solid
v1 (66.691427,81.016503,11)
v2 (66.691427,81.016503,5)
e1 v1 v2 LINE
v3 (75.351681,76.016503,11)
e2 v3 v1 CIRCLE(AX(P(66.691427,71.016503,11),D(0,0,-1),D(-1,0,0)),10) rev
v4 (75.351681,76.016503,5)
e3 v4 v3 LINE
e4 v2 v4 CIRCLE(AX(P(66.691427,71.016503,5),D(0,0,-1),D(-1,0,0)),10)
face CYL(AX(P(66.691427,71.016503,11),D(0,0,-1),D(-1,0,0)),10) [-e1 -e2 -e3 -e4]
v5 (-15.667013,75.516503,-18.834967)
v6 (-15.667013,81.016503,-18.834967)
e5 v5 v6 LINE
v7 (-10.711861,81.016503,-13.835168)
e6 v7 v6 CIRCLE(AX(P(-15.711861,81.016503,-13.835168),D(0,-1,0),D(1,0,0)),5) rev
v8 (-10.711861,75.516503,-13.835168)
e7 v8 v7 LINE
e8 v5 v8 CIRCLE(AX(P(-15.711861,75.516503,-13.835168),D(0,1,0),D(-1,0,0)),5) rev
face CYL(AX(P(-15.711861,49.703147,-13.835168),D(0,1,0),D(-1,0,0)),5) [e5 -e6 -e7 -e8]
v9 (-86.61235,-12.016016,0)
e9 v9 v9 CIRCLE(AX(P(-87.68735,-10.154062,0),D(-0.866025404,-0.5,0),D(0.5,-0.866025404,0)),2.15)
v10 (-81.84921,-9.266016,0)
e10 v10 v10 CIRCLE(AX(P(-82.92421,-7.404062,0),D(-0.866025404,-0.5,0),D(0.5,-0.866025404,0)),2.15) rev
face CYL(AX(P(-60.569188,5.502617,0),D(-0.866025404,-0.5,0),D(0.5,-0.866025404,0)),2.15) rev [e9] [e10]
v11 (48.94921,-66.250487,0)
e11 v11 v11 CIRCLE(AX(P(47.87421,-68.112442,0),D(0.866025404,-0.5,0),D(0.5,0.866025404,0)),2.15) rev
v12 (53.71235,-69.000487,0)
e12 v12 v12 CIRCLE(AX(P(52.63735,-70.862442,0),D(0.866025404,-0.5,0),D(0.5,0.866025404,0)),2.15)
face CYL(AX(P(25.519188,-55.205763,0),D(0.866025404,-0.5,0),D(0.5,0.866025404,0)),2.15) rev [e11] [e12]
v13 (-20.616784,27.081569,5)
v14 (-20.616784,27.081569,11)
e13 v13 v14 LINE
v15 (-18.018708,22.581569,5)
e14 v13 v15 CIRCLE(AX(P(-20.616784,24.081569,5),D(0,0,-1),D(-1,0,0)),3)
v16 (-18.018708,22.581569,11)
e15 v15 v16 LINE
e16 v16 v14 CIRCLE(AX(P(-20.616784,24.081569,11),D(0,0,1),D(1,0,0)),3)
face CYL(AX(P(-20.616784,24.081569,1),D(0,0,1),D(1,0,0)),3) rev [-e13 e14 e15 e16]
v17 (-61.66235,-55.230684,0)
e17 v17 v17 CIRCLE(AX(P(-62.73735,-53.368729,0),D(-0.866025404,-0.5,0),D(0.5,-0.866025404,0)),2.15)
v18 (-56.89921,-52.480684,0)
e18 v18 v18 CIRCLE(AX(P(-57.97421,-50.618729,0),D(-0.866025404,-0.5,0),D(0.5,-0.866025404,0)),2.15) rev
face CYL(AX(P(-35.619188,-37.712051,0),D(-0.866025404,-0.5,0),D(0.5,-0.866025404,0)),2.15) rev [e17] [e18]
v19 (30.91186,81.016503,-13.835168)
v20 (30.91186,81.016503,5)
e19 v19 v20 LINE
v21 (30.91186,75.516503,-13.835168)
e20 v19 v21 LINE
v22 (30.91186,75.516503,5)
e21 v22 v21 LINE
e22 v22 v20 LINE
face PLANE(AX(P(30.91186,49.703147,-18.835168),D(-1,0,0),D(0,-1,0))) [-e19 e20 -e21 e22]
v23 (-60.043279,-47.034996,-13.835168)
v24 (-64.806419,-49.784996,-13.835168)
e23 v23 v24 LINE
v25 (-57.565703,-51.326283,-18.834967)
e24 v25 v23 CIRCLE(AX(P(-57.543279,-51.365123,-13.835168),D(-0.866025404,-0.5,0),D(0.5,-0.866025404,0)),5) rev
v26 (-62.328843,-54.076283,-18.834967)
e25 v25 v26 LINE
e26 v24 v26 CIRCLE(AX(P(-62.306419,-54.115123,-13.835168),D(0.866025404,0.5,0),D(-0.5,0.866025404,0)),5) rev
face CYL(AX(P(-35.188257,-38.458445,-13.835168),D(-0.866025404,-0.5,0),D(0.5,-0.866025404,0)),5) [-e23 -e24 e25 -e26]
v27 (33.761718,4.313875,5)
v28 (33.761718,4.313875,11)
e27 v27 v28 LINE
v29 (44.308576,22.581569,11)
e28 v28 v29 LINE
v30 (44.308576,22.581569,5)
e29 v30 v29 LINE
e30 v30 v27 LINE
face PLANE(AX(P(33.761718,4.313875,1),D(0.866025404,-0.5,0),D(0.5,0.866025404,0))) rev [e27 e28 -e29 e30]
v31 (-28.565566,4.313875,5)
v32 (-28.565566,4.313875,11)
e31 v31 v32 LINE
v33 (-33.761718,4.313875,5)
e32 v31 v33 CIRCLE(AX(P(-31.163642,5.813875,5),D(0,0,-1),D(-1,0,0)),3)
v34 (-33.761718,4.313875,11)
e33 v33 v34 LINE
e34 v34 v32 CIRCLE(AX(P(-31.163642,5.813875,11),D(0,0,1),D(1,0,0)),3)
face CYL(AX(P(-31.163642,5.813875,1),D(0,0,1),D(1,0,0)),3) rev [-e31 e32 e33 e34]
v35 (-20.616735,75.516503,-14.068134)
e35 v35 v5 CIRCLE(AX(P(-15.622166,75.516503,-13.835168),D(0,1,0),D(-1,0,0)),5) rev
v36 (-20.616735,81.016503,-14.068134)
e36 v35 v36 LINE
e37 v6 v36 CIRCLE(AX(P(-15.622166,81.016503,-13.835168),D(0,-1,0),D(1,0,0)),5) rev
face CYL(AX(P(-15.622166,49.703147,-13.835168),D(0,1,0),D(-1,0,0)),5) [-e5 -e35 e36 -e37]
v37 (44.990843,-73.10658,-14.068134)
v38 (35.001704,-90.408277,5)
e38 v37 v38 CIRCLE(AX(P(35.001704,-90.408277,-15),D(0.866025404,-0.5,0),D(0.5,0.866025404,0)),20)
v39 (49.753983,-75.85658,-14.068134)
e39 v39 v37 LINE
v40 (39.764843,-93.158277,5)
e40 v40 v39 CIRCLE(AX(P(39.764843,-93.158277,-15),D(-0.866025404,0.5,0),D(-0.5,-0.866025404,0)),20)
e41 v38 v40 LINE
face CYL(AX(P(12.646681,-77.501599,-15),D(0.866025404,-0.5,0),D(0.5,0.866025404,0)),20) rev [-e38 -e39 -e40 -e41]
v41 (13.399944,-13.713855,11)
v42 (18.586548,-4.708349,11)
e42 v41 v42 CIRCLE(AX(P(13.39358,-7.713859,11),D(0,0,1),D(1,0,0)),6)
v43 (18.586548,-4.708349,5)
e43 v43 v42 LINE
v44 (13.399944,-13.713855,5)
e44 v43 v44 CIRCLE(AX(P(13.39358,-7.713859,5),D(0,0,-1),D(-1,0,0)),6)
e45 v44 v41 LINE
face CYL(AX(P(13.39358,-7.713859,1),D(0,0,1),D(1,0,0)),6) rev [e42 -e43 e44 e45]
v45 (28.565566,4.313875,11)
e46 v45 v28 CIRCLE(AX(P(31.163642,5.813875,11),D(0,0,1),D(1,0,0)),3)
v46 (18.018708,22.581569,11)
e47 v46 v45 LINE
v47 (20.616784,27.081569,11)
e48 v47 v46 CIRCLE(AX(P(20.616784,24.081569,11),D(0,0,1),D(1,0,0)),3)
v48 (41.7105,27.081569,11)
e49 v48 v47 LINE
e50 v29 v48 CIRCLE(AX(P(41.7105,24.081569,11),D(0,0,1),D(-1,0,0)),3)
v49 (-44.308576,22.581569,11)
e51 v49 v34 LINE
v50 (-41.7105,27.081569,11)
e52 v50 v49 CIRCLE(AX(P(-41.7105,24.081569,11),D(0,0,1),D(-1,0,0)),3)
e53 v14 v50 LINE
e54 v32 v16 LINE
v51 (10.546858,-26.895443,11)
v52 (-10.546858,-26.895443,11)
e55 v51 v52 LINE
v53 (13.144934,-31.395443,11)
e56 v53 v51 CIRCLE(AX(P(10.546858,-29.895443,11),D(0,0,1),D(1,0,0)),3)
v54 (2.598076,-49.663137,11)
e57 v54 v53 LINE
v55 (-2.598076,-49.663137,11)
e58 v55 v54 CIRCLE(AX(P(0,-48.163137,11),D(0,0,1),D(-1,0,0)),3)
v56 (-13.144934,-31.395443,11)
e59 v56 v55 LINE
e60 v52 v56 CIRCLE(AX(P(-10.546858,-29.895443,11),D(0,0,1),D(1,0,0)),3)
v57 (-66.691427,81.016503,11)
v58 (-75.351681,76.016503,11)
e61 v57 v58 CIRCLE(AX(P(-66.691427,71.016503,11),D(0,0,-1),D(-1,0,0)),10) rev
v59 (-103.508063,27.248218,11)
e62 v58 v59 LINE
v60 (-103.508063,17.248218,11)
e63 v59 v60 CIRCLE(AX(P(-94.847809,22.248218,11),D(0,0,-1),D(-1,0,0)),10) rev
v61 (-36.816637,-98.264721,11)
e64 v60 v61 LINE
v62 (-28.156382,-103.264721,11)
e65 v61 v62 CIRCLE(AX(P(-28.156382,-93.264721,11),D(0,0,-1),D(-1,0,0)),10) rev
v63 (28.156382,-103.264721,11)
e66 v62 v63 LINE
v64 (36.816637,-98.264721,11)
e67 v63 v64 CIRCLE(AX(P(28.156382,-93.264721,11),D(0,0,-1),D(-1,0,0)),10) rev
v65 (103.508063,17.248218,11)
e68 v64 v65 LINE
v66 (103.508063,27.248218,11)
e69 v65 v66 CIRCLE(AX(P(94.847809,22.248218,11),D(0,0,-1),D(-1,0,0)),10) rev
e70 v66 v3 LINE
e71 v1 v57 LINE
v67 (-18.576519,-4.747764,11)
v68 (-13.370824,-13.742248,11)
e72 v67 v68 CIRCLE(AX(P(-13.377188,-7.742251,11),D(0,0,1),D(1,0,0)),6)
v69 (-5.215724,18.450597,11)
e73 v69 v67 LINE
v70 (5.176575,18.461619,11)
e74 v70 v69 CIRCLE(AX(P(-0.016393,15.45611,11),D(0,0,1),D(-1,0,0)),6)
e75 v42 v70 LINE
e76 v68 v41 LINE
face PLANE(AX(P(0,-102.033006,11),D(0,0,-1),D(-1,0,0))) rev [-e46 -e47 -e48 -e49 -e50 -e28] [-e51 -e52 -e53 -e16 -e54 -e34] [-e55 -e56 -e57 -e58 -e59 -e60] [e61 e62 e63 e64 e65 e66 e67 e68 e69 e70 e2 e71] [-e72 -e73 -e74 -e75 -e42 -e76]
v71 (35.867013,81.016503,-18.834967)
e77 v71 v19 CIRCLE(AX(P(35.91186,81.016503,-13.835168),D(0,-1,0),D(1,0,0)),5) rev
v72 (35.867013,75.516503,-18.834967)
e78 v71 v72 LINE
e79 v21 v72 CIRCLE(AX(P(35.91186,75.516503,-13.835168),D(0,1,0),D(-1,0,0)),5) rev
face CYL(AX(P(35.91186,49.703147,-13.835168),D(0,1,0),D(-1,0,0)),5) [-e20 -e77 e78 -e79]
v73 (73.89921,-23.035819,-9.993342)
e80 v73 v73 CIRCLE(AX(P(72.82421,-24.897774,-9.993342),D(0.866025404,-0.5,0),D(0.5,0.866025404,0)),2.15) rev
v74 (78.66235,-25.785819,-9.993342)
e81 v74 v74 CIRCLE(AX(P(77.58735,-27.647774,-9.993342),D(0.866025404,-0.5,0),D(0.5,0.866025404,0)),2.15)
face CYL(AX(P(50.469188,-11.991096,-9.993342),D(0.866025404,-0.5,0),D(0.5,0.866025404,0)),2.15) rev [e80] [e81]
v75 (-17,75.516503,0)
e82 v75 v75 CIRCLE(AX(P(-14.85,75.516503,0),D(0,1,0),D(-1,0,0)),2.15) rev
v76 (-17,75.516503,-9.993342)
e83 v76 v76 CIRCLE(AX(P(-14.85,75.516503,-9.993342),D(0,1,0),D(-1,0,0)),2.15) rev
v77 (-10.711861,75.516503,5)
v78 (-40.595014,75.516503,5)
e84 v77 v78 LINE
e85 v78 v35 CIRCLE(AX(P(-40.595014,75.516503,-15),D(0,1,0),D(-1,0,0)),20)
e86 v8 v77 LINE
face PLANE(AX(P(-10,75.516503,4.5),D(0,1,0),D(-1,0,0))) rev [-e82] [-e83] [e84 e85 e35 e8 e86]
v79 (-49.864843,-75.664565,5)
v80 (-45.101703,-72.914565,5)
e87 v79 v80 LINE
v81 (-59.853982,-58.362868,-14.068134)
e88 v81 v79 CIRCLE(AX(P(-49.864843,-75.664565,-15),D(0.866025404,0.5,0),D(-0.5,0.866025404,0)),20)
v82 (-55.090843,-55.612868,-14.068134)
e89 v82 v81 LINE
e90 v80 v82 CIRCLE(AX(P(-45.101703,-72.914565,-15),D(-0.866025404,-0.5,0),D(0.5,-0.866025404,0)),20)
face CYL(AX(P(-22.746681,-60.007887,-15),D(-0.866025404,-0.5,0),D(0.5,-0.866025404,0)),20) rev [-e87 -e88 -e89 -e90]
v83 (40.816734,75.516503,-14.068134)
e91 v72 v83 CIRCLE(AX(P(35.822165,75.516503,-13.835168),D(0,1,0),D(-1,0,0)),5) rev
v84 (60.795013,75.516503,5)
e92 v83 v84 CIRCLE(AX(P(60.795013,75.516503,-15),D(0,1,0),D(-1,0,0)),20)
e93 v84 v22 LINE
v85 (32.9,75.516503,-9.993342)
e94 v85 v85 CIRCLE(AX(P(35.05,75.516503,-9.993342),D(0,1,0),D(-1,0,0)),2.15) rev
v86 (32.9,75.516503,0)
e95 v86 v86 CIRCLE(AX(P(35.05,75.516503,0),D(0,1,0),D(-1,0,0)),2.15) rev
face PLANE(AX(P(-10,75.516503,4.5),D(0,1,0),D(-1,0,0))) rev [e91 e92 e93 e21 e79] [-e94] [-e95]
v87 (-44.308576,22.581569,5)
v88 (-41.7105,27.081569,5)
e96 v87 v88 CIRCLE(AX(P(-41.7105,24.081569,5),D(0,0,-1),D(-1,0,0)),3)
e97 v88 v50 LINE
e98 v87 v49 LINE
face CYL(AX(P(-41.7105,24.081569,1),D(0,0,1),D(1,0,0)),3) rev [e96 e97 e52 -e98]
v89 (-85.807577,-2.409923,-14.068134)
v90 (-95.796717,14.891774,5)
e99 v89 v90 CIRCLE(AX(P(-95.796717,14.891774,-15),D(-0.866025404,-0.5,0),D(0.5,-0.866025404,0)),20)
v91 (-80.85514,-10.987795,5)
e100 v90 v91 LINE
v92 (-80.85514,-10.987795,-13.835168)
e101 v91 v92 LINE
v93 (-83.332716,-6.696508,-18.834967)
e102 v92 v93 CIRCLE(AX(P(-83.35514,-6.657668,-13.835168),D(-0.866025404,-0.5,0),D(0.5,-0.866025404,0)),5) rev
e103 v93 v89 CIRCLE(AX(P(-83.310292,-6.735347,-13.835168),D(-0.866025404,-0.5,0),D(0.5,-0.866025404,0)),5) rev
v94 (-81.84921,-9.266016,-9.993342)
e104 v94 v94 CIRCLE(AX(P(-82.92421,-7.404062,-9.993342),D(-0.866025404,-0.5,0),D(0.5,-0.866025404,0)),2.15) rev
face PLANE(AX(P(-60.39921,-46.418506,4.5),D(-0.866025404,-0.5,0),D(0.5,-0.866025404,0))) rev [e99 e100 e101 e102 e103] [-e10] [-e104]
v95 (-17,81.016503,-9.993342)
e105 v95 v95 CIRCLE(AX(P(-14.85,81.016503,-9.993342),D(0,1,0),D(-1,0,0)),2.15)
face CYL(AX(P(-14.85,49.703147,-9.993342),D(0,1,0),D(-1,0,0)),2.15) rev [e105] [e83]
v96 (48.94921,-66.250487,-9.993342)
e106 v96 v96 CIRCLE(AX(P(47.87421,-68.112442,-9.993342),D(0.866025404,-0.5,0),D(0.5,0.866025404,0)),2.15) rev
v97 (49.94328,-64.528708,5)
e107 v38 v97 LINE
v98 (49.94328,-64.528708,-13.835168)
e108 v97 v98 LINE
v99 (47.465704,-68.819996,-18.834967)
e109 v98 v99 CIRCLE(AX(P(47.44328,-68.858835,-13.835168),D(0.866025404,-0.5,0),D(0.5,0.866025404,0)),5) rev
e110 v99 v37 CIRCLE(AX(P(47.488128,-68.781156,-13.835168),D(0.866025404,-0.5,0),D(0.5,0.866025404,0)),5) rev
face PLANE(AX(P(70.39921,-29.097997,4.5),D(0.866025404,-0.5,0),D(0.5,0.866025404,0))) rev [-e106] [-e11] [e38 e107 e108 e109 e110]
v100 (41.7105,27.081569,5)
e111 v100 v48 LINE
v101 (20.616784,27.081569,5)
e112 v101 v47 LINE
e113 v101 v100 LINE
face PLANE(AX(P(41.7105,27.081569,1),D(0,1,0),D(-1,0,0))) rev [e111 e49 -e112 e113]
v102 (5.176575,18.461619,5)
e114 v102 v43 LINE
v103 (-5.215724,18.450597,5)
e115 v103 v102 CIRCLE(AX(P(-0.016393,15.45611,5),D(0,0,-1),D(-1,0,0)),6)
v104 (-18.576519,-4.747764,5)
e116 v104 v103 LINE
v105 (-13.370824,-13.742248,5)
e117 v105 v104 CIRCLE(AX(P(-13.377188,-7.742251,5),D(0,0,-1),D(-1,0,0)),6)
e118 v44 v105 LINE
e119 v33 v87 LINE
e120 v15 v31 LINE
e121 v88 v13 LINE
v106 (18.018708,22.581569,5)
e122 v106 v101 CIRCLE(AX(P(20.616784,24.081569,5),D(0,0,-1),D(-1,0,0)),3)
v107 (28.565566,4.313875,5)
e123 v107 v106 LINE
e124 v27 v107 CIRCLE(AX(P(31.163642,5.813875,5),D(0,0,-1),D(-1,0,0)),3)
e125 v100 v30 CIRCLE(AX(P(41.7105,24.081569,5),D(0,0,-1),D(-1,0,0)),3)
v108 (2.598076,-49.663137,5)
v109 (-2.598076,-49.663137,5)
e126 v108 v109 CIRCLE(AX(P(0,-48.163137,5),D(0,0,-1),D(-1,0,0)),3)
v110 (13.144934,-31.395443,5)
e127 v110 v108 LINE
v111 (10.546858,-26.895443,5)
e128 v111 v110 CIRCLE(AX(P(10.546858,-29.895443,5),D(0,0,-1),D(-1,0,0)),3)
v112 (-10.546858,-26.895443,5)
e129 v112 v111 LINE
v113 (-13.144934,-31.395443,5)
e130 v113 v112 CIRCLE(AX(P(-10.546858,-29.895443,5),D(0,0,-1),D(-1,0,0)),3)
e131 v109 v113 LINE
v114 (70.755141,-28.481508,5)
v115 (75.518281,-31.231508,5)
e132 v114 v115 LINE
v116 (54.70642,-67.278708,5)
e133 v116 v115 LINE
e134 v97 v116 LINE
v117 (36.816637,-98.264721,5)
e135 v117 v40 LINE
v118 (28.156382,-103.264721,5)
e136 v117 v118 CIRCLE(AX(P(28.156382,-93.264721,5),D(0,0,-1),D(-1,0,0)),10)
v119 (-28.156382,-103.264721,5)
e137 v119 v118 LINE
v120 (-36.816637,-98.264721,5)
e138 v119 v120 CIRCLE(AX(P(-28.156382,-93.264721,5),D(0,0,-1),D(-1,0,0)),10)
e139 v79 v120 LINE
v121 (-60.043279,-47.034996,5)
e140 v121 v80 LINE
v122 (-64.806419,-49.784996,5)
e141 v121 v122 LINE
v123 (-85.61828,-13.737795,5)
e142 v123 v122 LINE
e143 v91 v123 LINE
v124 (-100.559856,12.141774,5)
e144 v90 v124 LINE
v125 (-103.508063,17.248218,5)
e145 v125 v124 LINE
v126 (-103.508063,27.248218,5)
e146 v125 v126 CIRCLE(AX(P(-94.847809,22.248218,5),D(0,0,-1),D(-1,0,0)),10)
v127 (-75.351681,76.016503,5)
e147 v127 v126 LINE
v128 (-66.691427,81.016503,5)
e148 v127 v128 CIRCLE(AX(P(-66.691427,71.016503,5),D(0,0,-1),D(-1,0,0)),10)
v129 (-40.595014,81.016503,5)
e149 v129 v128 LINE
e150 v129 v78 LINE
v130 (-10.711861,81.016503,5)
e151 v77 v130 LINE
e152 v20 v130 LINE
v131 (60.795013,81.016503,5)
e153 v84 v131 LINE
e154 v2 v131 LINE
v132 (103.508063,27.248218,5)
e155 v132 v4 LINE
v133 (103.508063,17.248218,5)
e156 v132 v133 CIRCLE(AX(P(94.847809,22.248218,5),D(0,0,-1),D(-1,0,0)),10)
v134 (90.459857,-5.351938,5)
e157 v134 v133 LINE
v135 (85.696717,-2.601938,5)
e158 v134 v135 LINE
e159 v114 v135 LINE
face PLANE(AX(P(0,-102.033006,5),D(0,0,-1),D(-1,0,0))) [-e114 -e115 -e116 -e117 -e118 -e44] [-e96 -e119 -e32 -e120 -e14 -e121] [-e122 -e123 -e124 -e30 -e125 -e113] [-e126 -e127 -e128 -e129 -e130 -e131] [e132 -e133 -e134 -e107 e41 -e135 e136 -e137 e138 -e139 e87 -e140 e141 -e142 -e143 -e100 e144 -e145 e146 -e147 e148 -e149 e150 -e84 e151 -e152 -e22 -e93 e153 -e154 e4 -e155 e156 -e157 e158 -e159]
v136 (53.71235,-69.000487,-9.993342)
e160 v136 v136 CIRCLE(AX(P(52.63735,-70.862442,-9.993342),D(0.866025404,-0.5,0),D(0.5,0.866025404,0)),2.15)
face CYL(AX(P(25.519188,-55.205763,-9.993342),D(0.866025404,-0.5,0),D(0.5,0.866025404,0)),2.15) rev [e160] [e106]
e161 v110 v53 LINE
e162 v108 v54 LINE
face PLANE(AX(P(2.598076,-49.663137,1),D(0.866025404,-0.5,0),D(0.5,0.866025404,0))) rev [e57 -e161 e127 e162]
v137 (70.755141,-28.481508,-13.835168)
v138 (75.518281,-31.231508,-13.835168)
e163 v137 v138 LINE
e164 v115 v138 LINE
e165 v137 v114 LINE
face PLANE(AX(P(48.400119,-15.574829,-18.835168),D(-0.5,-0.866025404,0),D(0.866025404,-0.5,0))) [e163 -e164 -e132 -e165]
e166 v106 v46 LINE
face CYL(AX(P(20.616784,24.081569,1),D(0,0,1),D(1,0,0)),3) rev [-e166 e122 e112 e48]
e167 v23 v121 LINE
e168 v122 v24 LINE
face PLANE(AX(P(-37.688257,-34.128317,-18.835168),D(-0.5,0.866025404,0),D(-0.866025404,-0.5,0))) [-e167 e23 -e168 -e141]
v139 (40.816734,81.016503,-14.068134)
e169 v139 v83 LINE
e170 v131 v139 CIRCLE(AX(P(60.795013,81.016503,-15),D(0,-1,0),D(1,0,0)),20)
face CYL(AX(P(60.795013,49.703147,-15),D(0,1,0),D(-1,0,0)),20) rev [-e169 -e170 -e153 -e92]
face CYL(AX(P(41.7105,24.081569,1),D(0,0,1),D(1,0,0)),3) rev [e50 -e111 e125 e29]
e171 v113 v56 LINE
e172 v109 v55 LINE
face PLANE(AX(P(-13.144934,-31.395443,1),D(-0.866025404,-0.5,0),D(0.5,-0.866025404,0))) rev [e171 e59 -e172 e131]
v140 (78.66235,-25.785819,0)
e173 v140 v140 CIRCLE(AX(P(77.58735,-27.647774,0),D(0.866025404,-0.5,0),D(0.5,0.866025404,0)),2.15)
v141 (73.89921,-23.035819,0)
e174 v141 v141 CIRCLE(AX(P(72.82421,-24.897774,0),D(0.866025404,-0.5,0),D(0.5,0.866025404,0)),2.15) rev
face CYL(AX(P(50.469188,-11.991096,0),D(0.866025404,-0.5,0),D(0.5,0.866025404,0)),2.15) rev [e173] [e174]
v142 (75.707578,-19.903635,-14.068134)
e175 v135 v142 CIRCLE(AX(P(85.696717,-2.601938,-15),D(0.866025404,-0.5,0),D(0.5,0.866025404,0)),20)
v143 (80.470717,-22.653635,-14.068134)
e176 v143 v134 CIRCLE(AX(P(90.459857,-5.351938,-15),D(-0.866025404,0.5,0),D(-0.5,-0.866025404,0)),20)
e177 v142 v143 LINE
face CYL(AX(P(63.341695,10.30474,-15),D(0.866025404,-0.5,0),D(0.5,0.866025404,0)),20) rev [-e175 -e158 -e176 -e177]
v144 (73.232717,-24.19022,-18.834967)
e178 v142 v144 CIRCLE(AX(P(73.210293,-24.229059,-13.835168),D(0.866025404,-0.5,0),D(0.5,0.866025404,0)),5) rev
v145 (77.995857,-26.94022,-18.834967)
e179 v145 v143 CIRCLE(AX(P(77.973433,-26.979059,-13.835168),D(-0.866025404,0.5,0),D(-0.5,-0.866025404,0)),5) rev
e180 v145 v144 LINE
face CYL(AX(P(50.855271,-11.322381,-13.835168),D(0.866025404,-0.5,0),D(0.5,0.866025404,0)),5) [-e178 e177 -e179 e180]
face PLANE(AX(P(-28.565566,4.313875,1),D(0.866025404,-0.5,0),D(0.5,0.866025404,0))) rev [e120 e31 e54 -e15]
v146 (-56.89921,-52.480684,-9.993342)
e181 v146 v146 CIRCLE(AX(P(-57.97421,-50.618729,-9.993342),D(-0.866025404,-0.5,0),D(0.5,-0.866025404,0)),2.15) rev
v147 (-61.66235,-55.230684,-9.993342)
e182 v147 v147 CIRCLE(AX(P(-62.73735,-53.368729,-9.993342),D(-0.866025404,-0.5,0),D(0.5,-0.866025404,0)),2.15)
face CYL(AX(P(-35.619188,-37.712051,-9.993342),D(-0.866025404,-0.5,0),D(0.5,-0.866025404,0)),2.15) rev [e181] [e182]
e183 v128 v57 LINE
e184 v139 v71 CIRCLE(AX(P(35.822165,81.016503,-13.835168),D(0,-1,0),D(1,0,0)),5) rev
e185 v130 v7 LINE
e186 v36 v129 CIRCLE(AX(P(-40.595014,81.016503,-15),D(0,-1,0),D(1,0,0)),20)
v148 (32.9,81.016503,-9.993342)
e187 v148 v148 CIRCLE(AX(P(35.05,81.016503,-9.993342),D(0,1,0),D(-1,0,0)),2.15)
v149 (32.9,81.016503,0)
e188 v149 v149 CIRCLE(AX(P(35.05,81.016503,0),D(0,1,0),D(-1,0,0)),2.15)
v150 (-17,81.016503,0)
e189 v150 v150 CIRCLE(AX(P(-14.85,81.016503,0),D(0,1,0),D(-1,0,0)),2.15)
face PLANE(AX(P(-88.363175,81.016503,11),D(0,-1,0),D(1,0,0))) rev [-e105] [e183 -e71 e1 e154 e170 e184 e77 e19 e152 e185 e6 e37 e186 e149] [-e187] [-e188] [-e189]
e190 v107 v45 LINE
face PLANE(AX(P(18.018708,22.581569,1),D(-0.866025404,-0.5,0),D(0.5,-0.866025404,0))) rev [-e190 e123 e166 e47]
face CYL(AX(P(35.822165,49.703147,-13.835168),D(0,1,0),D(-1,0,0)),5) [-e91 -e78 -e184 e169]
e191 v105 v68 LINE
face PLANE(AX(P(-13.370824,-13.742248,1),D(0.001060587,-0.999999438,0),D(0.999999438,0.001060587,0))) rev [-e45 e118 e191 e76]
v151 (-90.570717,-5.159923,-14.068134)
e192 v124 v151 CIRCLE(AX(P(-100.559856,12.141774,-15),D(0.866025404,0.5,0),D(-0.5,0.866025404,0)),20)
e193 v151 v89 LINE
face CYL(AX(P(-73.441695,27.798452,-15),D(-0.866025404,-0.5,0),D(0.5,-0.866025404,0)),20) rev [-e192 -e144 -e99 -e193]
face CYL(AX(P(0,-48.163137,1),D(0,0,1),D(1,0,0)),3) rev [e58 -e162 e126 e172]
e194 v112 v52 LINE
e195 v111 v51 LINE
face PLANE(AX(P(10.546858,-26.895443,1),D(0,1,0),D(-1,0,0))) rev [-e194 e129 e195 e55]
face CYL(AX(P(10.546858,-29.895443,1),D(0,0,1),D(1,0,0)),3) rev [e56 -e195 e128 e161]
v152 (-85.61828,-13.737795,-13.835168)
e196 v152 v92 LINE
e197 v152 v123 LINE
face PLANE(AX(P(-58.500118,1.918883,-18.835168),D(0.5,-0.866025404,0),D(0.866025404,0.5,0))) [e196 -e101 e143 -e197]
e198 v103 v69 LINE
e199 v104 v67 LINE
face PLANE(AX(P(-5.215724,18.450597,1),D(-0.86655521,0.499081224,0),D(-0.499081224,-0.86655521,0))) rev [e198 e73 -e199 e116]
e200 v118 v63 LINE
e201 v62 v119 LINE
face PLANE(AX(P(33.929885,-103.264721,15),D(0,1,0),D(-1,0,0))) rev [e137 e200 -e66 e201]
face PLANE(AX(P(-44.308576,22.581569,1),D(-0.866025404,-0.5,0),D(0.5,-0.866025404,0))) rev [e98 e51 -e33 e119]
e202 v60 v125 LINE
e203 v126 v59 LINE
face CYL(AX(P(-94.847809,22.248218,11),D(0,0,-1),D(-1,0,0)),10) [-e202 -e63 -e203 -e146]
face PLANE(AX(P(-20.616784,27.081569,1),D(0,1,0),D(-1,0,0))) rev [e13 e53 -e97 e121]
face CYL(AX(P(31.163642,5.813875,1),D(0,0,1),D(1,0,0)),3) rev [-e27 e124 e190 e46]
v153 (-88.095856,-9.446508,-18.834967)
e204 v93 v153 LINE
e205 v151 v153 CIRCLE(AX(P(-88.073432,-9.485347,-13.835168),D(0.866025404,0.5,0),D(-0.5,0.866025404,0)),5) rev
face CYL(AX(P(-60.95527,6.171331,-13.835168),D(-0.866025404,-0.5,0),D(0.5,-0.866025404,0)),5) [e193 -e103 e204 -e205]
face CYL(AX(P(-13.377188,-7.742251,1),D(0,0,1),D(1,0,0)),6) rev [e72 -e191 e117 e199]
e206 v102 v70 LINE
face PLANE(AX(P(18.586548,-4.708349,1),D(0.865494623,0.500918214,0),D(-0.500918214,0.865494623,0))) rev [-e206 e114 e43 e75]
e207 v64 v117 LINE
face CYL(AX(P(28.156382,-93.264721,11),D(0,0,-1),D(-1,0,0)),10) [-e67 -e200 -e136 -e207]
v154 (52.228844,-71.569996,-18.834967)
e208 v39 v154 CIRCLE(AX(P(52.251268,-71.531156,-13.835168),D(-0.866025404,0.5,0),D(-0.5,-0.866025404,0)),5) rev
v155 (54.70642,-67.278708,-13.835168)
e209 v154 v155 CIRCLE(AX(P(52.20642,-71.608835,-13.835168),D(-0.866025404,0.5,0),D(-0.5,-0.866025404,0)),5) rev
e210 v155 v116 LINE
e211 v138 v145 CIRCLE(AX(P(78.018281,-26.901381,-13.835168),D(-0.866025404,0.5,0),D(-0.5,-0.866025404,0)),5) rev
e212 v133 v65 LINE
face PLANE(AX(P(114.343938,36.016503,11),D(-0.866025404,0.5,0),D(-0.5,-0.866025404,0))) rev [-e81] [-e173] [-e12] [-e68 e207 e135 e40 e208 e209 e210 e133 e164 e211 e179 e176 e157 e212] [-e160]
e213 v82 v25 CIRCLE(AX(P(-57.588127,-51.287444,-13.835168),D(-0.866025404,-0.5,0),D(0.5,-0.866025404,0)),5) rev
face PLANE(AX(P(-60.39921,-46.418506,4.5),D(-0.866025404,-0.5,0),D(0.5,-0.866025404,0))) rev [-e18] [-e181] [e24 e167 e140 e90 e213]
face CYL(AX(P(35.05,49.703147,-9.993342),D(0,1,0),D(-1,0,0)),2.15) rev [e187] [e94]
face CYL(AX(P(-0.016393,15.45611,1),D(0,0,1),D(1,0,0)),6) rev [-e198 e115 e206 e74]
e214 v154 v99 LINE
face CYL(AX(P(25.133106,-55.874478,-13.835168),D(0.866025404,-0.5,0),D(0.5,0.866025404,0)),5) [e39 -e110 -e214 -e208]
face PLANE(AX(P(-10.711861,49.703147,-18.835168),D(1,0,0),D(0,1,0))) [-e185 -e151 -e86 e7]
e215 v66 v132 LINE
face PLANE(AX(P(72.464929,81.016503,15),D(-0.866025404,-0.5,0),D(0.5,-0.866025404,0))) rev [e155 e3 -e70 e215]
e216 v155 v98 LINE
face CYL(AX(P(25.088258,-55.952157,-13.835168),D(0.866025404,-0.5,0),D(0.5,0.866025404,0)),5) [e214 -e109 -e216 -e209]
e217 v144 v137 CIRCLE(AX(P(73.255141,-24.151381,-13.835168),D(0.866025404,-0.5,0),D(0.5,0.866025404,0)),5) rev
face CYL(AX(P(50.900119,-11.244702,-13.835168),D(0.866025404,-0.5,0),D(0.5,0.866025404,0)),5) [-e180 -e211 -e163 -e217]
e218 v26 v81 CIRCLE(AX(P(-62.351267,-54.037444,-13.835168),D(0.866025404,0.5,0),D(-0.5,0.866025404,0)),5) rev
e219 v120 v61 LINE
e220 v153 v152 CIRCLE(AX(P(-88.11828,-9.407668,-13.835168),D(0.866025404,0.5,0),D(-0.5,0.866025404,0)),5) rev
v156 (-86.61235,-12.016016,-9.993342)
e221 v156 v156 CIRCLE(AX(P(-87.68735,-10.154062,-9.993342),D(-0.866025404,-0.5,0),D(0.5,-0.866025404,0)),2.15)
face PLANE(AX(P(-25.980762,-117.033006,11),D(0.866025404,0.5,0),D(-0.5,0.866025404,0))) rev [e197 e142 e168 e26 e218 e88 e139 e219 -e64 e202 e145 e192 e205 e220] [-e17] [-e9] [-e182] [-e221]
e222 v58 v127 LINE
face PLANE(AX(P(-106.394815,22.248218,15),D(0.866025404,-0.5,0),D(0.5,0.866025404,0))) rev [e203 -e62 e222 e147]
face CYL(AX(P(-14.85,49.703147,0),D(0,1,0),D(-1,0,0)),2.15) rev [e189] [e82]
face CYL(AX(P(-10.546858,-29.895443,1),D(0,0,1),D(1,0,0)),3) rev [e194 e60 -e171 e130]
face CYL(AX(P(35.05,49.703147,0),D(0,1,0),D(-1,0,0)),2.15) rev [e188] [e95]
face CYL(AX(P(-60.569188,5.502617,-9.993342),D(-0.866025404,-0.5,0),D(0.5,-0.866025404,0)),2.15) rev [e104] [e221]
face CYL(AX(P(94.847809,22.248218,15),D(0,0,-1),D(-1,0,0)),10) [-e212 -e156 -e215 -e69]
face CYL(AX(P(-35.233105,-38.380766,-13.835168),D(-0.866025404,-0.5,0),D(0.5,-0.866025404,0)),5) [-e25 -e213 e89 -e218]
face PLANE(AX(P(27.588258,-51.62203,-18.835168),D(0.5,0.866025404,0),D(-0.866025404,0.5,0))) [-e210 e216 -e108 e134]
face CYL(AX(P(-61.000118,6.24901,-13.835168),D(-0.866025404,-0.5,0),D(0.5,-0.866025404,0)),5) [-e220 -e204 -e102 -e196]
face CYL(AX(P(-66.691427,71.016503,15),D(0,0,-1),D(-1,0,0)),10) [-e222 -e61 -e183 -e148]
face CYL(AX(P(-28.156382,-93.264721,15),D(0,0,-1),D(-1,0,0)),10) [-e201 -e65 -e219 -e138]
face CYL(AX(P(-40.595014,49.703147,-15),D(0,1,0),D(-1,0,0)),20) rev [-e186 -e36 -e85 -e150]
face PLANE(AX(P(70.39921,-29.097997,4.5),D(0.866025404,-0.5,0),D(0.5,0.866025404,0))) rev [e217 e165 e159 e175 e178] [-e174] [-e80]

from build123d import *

# Parameters (mm, degrees)
SKETCH3_W              = 73.802028427
SKETCH3_H              = 33.55074113
BOSS_EXTRUDE1_DEPTH    = 5
BOSS_EXTRUDE2_DEPTH    = 6
CUT_EXTRUDE1_OUTLINE_W = 73.802028427
CUT_EXTRUDE1_OUTLINE_H = 33.55074113
CUT_EXTRUDE1_DEPTH     = 5
SKETCH11_W             = 9.910304241
SKETCH11_H             = 23.835167919
SKETCH11_R             = 2.15
BOSS_EXTRUDE3_DEPTH    = 5.5
BOSS_EXTRUDE3_2_DEPTH  = 5.5
CIRPATTERN3_COUNT      = 3
FILLET3_R              = 5
FILLET4_R              = 20
CUT_EXTRUDE2_DEPTH     = 10
CUT_EXTRUDE3_DEPTH     = 10
FILLET5_R              = 10
FILLET6_R              = 10


# Read off the part's stored shape, not the designer's step: Cut-Extrude1
with BuildPart() as part:
    # Sketch3 → Boss-Extrude1 (new body)
    with BuildSketch(Plane.XY):
        with Locations((2.875089275, 11.32460742)):
            Rectangle(SKETCH3_W, SKETCH3_H)
    extrude(amount=BOSS_EXTRUDE1_DEPTH)

    # Sketch4 → Boss-Extrude2 (add)
    with BuildSketch(Plane.XY.offset(5)):
        with BuildLine():
            Line((-88.363175499, 81.016503161), (88.363175499, 81.016503161))
            ThreePointArc((88.363175499, 81.016503161), (114.343937613, 66.016503161), (114.343937613, 36.016503161))
            Line((114.343937613, 36.016503161), (25.980762114, -117.033006322))
            ThreePointArc((25.980762114, -117.033006322), (0, -132.033006322), (-25.980762114, -117.033006322))
            Line((-25.980762114, -117.033006322), (-114.343937613, 36.016503161))
            ThreePointArc((-114.343937613, 36.016503161), (-114.343937613, 66.016503161), (-88.363175499, 81.016503161))
        make_face()
    extrude(amount=BOSS_EXTRUDE2_DEPTH)

    # Cut-Extrude1 outline → Cut-Extrude1 (cut)
    with BuildSketch(Plane(origin=(0, 0, 5), x_dir=(-1, 0, 0), z_dir=(0, 0, -1))):
        with Locations((-2.875089275, 11.32460742)):
            Rectangle(CUT_EXTRUDE1_OUTLINE_W, CUT_EXTRUDE1_OUTLINE_H)
    extrude(amount=CUT_EXTRUDE1_DEPTH, mode=Mode.SUBTRACT)


with BuildPart() as body_2:
    # Sketch11 → Boss-Extrude3 (new body)
    with BuildSketch(Plane(origin=(0, 81.016503161, 0), x_dir=(1, 0, 0), z_dir=(0, 1, 0))):
        with Locations((-15.667013432, 6.917583959)):
            Rectangle(SKETCH11_W, SKETCH11_H)
        with Locations(Location((-14.850000449, 9.993341923, 0), (0, 0, 180))):
            Circle(SKETCH11_R, mode=Mode.SUBTRACT)
        with Locations(Location((-14.850000449, 0, 0), (0, 0, 180))):
            Circle(SKETCH11_R, mode=Mode.SUBTRACT)
    extrude(amount=-BOSS_EXTRUDE3_DEPTH)


with BuildPart() as body_3:
    # Sketch11 → Boss-Extrude3 2 (new body)
    with BuildSketch(Plane(origin=(0, 81.016503161, 0), x_dir=(1, 0, 0), z_dir=(0, 1, 0))):
        with Locations((35.867012534, 6.917583959)):
            Rectangle(SKETCH11_W, SKETCH11_H)
        with Locations(Location((35.049999551, 9.993341923, 0), (0, 0, 180))):
            Circle(SKETCH11_R, mode=Mode.SUBTRACT)
        with Locations(Location((35.049999551, 0, 0), (0, 0, 180))):
            Circle(SKETCH11_R, mode=Mode.SUBTRACT)
    extrude(amount=-BOSS_EXTRUDE3_2_DEPTH)


with BuildPart() as cirpattern3_1:
    # CirPattern3: pattern copy
    add(body_3.part.rotate(Axis((0, 0, 0), (0, 0, 1)), 1 * 360 / CIRPATTERN3_COUNT))


with BuildPart() as cirpattern3_2:
    # CirPattern3: pattern copy
    add(body_3.part.rotate(Axis((0, 0, 0), (0, 0, 1)), 2 * 360 / CIRPATTERN3_COUNT))


with BuildPart() as cirpattern3_3:
    # CirPattern3: pattern copy
    add(body_2.part.rotate(Axis((0, 0, 0), (0, 0, 1)), 1 * 360 / CIRPATTERN3_COUNT))


with BuildPart() as cirpattern3_4:
    # CirPattern3: pattern copy
    add(body_2.part.rotate(Axis((0, 0, 0), (0, 0, 1)), 2 * 360 / CIRPATTERN3_COUNT))


with BuildPart() as part_1:
    add(part.part)

    # Combine1: union CirPattern3_1, CirPattern3_3, CirPattern3_2, CirPattern3_4, body 3, body 2
    add(cirpattern3_1.part)
    add(cirpattern3_3.part)
    add(cirpattern3_2.part)
    add(cirpattern3_4.part)
    add(body_3.part)
    add(body_2.part)

    # Fillet3
    # the kernel refuses this fillet: 5 mm, written as the material it takes off along each edge
    with BuildSketch(Plane(origin=(30.911860413, 93.516503161, -18.835167919), x_dir=(0, 0, 1), z_dir=(0, -1, 0)), Plane(origin=(-20.622165552, 93.516503161, -18.835167919), x_dir=(0, 0, 1), z_dir=(0, -1, 0)), Plane(origin=(91.298750186, -28.898932331, -18.835167919), x_dir=(0, 0, 1), z_dir=(-0.866025403784445, 0.4999999999999889, 0)), Plane(origin=(65.531737204, -73.528707976, -18.835167919), x_dir=(0, 0, 1), z_dir=(-0.866025403784445, 0.4999999999999889, 0)), Plane(origin=(-96.443597617, -19.987795185, -18.835167919), x_dir=(0, 0, 1), z_dir=(0.8660254037844322, 0.5000000000000114, 0)), Plane(origin=(-70.676584634, -64.61757083, -18.835167919), x_dir=(0, 0, 1), z_dir=(0.8660254037844322, 0.5000000000000114, 0))) as fillet3_piece_1:
        with BuildLine():
            CenterArc((FILLET3_R, -FILLET3_R), FILLET3_R, 90, 90)
            Line((0, -FILLET3_R), (0, 0))
            Line((0, 0), (FILLET3_R, 0))
        make_face()
    extrude(amount=30.5, mode=Mode.SUBTRACT)
    with BuildSketch(Plane(origin=(40.822164654, 93.516503161, -18.835167919), x_dir=(0, 0, 1), z_dir=(0, -1, 0)), Plane(origin=(-10.711861311, 93.516503161, -18.835167919), x_dir=(0, 0, 1), z_dir=(0, -1, 0)), Plane(origin=(86.343598066, -37.481507563, -18.835167919), x_dir=(0, 0, 1), z_dir=(-0.866025403784445, 0.4999999999999889, 0)), Plane(origin=(60.576585084, -82.111283208, -18.835167919), x_dir=(0, 0, 1), z_dir=(-0.866025403784445, 0.4999999999999889, 0)), Plane(origin=(-101.398749737, -11.405219953, -18.835167919), x_dir=(0, 0, 1), z_dir=(0.8660254037844322, 0.5000000000000114, 0)), Plane(origin=(-75.631736755, -56.034995598, -18.835167919), x_dir=(0, 0, 1), z_dir=(0.8660254037844322, 0.5000000000000114, 0))) as fillet3_piece_2:
        with BuildLine():
            CenterArc((FILLET3_R, FILLET3_R), FILLET3_R, 180, 90)
            Line((0, FILLET3_R), (0, 0))
            Line((0, 0), (FILLET3_R, 0))
        make_face()
    extrude(amount=30.5, mode=Mode.SUBTRACT)

    # Fillet4
    # the kernel refuses this fillet: 20 mm, written as the material it adds along each edge
    with BuildSketch(Plane(origin=(80.473432639, -22.648932331, 5), x_dir=(0.4999999999999889, 0.866025403784445, 0), z_dir=(-0.866025403784445, 0.4999999999999889, 0)), Plane(origin=(-59.851267087, -58.36757083, 5), x_dir=(0.5000000000000114, -0.8660254037844322, 0), z_dir=(0.8660254037844322, 0.5000000000000113, 0)), Plane(origin=(-20.622165552, 81.016503161, 5), x_dir=(-1, 0, 0), z_dir=(0, -1, 0))) as fillet4_piece_1:
        with BuildLine():
            CenterArc((19.97284858, 20), FILLET4_R, 182.670565348, 87.329434652)
            Line((-0.005430284, 19.068134335), (-2.00325817, 18.974947769))
            ThreePointArc((-2.00325817, 18.974947769), (-2, 18.835167919), (-2, 0))
            Line((-2, 0), (0, -2))
            Line((0, -2), (19.97284858, -2))
            Line((19.97284858, -2), (19.97284858, 0))
        make_face()
    extrude(amount=5.5)
    with BuildSketch(Plane(origin=(49.751267536, -75.861283208, 5), x_dir=(-0.4999999999999889, -0.8660254037844451, 0), z_dir=(-0.866025403784445, 0.4999999999999889, 0)), Plane(origin=(-90.57343219, -5.155219953, 5), x_dir=(-0.5000000000000113, 0.8660254037844322, 0), z_dir=(0.8660254037844322, 0.5000000000000113, 0)), Plane(origin=(40.822164654, 81.016503161, 5), x_dir=(1, 0, 0), z_dir=(0, -1, 0))) as fillet4_piece_2:
        with BuildLine():
            CenterArc((19.97284858, -20), FILLET4_R, 90, 87.329434652)
            Line((-0.005430284, -19.068134335), (-2.00325817, -18.974947769))
            ThreePointArc((-2.00325817, -18.974947769), (-2, -18.835167919), (-2, 0))
            Line((-2, 0), (0, 2))
            Line((0, 2), (19.97284858, 2))
            Line((19.97284858, 2), (19.97284858, 0))
        make_face()
    extrude(amount=5.5)

    # Sketch13 → Cut-Extrude2 (cut)
    with BuildSketch(Plane.XY.offset(11)):
        with BuildLine():
            Line((-5.215723818, 18.4505975), (-18.576519023, -4.747764108))
            ThreePointArc((-18.576519023, -4.747764108), (-18.570155502, -10.747760733), (-13.370824241, -13.742248075))
            Line((-13.370824241, -13.742248075), (13.39994384, -13.713855334))
            ThreePointArc((13.39994384, -13.713855334), (18.59291158, -10.70834605), (18.586548059, -4.708349425))
            Line((18.586548059, -4.708349425), (5.176575183, 18.461619442))
            ThreePointArc((5.176575183, 18.461619442), (-0.022756078, 21.456106783), (-5.215723818, 18.4505975))
        make_face()
        with BuildLine():
            Line((-44.30857639, 22.581568506), (-33.761718484, 4.313874753))
            ThreePointArc((-33.761718484, 4.313874753), (-31.163642273, 2.813874753), (-28.565566061, 4.313874753))
            Line((-28.565566061, 4.313874753), (-18.018708156, 22.581568506))
            ThreePointArc((-18.018708156, 22.581568506), (-18.018708156, 25.581568506), (-20.616784367, 27.081568506))
            Line((-20.616784367, 27.081568506), (-41.710500179, 27.081568506))
            ThreePointArc((-41.710500179, 27.081568506), (-44.30857639, 25.581568506), (-44.30857639, 22.581568506))
        make_face()
        with BuildLine():
            Line((2.598076211, -49.663137012), (13.144934117, -31.395443259))
            ThreePointArc((13.144934117, -31.395443259), (13.144934117, -28.395443259), (10.546857906, -26.895443259))
            Line((10.546857906, -26.895443259), (-10.546857906, -26.895443259))
            ThreePointArc((-10.546857906, -26.895443259), (-13.144934117, -28.395443259), (-13.144934117, -31.395443259))
            Line((-13.144934117, -31.395443259), (-2.598076211, -49.663137012))
            ThreePointArc((-2.598076211, -49.663137012), (0, -51.163137012), (2.598076211, -49.663137012))
        make_face()
        with BuildLine():
            Line((41.710500179, 27.081568506), (20.616784367, 27.081568506))
            ThreePointArc((20.616784367, 27.081568506), (18.018708156, 25.581568506), (18.018708156, 22.581568506))
            Line((18.018708156, 22.581568506), (28.565566061, 4.313874753))
            ThreePointArc((28.565566061, 4.313874753), (31.163642273, 2.813874753), (33.761718484, 4.313874753))
            Line((33.761718484, 4.313874753), (44.30857639, 22.581568506))
            ThreePointArc((44.30857639, 22.581568506), (44.30857639, 25.581568506), (41.710500179, 27.081568506))
        make_face()
    extrude(amount=-CUT_EXTRUDE2_DEPTH, mode=Mode.SUBTRACT)

    # Sketch14 → Cut-Extrude3 (cut)
    with BuildSketch(Plane(origin=(0, 0, 5), x_dir=(-1, 0, 0), z_dir=(0, 0, -1))):
        with BuildLine():
            Line((-72.464929389, 81.016503161), (-106.394814558, 22.248218154))
            Line((-106.394814558, 22.248218154), (-114.343937613, 36.016503161))
            ThreePointArc((-114.343937613, 36.016503161), (-114.343937613, 66.016503161), (-88.363175499, 81.016503161))
            Line((-88.363175499, 81.016503161), (-72.464929389, 81.016503161))
        make_face()
        with BuildLine():
            Line((106.394814558, 22.248218154), (72.464929389, 81.016503161))
            Line((72.464929389, 81.016503161), (88.363175499, 81.016503161))
            ThreePointArc((88.363175499, 81.016503161), (114.343937613, 66.016503161), (114.343937613, 36.016503161))
            Line((114.343937613, 36.016503161), (106.394814558, 22.248218154))
        make_face()
        with BuildLine():
            Line((-33.929885169, -103.264721315), (33.929885169, -103.264721315))
            Line((33.929885169, -103.264721315), (25.980762114, -117.033006322))
            ThreePointArc((25.980762114, -117.033006322), (0, -132.033006322), (-25.980762114, -117.033006322))
            Line((-25.980762114, -117.033006322), (-33.929885169, -103.264721315))
        make_face()
    extrude(amount=-CUT_EXTRUDE3_DEPTH, mode=Mode.SUBTRACT)

    # Fillet5
    fillet5_edges = [part_1.edges().sort_by_distance(p)[0] for p in [
        (72.464929389, 81.016503161, 8),
    ]]
    fillet(fillet5_edges, radius=FILLET5_R)

    # Fillet6
    fillet6_edges = [part_1.edges().sort_by_distance(p)[0] for p in [
        (106.394814558, 22.248218154, 8),
        (-72.464929389, 81.016503161, 8),
        (-106.394814558, 22.248218154, 8),
        (-33.929885169, -103.264721315, 8),
        (33.929885169, -103.264721315, 8),
    ]]
    fillet(fillet6_edges, radius=FILLET6_R)


solid = part_1.part
